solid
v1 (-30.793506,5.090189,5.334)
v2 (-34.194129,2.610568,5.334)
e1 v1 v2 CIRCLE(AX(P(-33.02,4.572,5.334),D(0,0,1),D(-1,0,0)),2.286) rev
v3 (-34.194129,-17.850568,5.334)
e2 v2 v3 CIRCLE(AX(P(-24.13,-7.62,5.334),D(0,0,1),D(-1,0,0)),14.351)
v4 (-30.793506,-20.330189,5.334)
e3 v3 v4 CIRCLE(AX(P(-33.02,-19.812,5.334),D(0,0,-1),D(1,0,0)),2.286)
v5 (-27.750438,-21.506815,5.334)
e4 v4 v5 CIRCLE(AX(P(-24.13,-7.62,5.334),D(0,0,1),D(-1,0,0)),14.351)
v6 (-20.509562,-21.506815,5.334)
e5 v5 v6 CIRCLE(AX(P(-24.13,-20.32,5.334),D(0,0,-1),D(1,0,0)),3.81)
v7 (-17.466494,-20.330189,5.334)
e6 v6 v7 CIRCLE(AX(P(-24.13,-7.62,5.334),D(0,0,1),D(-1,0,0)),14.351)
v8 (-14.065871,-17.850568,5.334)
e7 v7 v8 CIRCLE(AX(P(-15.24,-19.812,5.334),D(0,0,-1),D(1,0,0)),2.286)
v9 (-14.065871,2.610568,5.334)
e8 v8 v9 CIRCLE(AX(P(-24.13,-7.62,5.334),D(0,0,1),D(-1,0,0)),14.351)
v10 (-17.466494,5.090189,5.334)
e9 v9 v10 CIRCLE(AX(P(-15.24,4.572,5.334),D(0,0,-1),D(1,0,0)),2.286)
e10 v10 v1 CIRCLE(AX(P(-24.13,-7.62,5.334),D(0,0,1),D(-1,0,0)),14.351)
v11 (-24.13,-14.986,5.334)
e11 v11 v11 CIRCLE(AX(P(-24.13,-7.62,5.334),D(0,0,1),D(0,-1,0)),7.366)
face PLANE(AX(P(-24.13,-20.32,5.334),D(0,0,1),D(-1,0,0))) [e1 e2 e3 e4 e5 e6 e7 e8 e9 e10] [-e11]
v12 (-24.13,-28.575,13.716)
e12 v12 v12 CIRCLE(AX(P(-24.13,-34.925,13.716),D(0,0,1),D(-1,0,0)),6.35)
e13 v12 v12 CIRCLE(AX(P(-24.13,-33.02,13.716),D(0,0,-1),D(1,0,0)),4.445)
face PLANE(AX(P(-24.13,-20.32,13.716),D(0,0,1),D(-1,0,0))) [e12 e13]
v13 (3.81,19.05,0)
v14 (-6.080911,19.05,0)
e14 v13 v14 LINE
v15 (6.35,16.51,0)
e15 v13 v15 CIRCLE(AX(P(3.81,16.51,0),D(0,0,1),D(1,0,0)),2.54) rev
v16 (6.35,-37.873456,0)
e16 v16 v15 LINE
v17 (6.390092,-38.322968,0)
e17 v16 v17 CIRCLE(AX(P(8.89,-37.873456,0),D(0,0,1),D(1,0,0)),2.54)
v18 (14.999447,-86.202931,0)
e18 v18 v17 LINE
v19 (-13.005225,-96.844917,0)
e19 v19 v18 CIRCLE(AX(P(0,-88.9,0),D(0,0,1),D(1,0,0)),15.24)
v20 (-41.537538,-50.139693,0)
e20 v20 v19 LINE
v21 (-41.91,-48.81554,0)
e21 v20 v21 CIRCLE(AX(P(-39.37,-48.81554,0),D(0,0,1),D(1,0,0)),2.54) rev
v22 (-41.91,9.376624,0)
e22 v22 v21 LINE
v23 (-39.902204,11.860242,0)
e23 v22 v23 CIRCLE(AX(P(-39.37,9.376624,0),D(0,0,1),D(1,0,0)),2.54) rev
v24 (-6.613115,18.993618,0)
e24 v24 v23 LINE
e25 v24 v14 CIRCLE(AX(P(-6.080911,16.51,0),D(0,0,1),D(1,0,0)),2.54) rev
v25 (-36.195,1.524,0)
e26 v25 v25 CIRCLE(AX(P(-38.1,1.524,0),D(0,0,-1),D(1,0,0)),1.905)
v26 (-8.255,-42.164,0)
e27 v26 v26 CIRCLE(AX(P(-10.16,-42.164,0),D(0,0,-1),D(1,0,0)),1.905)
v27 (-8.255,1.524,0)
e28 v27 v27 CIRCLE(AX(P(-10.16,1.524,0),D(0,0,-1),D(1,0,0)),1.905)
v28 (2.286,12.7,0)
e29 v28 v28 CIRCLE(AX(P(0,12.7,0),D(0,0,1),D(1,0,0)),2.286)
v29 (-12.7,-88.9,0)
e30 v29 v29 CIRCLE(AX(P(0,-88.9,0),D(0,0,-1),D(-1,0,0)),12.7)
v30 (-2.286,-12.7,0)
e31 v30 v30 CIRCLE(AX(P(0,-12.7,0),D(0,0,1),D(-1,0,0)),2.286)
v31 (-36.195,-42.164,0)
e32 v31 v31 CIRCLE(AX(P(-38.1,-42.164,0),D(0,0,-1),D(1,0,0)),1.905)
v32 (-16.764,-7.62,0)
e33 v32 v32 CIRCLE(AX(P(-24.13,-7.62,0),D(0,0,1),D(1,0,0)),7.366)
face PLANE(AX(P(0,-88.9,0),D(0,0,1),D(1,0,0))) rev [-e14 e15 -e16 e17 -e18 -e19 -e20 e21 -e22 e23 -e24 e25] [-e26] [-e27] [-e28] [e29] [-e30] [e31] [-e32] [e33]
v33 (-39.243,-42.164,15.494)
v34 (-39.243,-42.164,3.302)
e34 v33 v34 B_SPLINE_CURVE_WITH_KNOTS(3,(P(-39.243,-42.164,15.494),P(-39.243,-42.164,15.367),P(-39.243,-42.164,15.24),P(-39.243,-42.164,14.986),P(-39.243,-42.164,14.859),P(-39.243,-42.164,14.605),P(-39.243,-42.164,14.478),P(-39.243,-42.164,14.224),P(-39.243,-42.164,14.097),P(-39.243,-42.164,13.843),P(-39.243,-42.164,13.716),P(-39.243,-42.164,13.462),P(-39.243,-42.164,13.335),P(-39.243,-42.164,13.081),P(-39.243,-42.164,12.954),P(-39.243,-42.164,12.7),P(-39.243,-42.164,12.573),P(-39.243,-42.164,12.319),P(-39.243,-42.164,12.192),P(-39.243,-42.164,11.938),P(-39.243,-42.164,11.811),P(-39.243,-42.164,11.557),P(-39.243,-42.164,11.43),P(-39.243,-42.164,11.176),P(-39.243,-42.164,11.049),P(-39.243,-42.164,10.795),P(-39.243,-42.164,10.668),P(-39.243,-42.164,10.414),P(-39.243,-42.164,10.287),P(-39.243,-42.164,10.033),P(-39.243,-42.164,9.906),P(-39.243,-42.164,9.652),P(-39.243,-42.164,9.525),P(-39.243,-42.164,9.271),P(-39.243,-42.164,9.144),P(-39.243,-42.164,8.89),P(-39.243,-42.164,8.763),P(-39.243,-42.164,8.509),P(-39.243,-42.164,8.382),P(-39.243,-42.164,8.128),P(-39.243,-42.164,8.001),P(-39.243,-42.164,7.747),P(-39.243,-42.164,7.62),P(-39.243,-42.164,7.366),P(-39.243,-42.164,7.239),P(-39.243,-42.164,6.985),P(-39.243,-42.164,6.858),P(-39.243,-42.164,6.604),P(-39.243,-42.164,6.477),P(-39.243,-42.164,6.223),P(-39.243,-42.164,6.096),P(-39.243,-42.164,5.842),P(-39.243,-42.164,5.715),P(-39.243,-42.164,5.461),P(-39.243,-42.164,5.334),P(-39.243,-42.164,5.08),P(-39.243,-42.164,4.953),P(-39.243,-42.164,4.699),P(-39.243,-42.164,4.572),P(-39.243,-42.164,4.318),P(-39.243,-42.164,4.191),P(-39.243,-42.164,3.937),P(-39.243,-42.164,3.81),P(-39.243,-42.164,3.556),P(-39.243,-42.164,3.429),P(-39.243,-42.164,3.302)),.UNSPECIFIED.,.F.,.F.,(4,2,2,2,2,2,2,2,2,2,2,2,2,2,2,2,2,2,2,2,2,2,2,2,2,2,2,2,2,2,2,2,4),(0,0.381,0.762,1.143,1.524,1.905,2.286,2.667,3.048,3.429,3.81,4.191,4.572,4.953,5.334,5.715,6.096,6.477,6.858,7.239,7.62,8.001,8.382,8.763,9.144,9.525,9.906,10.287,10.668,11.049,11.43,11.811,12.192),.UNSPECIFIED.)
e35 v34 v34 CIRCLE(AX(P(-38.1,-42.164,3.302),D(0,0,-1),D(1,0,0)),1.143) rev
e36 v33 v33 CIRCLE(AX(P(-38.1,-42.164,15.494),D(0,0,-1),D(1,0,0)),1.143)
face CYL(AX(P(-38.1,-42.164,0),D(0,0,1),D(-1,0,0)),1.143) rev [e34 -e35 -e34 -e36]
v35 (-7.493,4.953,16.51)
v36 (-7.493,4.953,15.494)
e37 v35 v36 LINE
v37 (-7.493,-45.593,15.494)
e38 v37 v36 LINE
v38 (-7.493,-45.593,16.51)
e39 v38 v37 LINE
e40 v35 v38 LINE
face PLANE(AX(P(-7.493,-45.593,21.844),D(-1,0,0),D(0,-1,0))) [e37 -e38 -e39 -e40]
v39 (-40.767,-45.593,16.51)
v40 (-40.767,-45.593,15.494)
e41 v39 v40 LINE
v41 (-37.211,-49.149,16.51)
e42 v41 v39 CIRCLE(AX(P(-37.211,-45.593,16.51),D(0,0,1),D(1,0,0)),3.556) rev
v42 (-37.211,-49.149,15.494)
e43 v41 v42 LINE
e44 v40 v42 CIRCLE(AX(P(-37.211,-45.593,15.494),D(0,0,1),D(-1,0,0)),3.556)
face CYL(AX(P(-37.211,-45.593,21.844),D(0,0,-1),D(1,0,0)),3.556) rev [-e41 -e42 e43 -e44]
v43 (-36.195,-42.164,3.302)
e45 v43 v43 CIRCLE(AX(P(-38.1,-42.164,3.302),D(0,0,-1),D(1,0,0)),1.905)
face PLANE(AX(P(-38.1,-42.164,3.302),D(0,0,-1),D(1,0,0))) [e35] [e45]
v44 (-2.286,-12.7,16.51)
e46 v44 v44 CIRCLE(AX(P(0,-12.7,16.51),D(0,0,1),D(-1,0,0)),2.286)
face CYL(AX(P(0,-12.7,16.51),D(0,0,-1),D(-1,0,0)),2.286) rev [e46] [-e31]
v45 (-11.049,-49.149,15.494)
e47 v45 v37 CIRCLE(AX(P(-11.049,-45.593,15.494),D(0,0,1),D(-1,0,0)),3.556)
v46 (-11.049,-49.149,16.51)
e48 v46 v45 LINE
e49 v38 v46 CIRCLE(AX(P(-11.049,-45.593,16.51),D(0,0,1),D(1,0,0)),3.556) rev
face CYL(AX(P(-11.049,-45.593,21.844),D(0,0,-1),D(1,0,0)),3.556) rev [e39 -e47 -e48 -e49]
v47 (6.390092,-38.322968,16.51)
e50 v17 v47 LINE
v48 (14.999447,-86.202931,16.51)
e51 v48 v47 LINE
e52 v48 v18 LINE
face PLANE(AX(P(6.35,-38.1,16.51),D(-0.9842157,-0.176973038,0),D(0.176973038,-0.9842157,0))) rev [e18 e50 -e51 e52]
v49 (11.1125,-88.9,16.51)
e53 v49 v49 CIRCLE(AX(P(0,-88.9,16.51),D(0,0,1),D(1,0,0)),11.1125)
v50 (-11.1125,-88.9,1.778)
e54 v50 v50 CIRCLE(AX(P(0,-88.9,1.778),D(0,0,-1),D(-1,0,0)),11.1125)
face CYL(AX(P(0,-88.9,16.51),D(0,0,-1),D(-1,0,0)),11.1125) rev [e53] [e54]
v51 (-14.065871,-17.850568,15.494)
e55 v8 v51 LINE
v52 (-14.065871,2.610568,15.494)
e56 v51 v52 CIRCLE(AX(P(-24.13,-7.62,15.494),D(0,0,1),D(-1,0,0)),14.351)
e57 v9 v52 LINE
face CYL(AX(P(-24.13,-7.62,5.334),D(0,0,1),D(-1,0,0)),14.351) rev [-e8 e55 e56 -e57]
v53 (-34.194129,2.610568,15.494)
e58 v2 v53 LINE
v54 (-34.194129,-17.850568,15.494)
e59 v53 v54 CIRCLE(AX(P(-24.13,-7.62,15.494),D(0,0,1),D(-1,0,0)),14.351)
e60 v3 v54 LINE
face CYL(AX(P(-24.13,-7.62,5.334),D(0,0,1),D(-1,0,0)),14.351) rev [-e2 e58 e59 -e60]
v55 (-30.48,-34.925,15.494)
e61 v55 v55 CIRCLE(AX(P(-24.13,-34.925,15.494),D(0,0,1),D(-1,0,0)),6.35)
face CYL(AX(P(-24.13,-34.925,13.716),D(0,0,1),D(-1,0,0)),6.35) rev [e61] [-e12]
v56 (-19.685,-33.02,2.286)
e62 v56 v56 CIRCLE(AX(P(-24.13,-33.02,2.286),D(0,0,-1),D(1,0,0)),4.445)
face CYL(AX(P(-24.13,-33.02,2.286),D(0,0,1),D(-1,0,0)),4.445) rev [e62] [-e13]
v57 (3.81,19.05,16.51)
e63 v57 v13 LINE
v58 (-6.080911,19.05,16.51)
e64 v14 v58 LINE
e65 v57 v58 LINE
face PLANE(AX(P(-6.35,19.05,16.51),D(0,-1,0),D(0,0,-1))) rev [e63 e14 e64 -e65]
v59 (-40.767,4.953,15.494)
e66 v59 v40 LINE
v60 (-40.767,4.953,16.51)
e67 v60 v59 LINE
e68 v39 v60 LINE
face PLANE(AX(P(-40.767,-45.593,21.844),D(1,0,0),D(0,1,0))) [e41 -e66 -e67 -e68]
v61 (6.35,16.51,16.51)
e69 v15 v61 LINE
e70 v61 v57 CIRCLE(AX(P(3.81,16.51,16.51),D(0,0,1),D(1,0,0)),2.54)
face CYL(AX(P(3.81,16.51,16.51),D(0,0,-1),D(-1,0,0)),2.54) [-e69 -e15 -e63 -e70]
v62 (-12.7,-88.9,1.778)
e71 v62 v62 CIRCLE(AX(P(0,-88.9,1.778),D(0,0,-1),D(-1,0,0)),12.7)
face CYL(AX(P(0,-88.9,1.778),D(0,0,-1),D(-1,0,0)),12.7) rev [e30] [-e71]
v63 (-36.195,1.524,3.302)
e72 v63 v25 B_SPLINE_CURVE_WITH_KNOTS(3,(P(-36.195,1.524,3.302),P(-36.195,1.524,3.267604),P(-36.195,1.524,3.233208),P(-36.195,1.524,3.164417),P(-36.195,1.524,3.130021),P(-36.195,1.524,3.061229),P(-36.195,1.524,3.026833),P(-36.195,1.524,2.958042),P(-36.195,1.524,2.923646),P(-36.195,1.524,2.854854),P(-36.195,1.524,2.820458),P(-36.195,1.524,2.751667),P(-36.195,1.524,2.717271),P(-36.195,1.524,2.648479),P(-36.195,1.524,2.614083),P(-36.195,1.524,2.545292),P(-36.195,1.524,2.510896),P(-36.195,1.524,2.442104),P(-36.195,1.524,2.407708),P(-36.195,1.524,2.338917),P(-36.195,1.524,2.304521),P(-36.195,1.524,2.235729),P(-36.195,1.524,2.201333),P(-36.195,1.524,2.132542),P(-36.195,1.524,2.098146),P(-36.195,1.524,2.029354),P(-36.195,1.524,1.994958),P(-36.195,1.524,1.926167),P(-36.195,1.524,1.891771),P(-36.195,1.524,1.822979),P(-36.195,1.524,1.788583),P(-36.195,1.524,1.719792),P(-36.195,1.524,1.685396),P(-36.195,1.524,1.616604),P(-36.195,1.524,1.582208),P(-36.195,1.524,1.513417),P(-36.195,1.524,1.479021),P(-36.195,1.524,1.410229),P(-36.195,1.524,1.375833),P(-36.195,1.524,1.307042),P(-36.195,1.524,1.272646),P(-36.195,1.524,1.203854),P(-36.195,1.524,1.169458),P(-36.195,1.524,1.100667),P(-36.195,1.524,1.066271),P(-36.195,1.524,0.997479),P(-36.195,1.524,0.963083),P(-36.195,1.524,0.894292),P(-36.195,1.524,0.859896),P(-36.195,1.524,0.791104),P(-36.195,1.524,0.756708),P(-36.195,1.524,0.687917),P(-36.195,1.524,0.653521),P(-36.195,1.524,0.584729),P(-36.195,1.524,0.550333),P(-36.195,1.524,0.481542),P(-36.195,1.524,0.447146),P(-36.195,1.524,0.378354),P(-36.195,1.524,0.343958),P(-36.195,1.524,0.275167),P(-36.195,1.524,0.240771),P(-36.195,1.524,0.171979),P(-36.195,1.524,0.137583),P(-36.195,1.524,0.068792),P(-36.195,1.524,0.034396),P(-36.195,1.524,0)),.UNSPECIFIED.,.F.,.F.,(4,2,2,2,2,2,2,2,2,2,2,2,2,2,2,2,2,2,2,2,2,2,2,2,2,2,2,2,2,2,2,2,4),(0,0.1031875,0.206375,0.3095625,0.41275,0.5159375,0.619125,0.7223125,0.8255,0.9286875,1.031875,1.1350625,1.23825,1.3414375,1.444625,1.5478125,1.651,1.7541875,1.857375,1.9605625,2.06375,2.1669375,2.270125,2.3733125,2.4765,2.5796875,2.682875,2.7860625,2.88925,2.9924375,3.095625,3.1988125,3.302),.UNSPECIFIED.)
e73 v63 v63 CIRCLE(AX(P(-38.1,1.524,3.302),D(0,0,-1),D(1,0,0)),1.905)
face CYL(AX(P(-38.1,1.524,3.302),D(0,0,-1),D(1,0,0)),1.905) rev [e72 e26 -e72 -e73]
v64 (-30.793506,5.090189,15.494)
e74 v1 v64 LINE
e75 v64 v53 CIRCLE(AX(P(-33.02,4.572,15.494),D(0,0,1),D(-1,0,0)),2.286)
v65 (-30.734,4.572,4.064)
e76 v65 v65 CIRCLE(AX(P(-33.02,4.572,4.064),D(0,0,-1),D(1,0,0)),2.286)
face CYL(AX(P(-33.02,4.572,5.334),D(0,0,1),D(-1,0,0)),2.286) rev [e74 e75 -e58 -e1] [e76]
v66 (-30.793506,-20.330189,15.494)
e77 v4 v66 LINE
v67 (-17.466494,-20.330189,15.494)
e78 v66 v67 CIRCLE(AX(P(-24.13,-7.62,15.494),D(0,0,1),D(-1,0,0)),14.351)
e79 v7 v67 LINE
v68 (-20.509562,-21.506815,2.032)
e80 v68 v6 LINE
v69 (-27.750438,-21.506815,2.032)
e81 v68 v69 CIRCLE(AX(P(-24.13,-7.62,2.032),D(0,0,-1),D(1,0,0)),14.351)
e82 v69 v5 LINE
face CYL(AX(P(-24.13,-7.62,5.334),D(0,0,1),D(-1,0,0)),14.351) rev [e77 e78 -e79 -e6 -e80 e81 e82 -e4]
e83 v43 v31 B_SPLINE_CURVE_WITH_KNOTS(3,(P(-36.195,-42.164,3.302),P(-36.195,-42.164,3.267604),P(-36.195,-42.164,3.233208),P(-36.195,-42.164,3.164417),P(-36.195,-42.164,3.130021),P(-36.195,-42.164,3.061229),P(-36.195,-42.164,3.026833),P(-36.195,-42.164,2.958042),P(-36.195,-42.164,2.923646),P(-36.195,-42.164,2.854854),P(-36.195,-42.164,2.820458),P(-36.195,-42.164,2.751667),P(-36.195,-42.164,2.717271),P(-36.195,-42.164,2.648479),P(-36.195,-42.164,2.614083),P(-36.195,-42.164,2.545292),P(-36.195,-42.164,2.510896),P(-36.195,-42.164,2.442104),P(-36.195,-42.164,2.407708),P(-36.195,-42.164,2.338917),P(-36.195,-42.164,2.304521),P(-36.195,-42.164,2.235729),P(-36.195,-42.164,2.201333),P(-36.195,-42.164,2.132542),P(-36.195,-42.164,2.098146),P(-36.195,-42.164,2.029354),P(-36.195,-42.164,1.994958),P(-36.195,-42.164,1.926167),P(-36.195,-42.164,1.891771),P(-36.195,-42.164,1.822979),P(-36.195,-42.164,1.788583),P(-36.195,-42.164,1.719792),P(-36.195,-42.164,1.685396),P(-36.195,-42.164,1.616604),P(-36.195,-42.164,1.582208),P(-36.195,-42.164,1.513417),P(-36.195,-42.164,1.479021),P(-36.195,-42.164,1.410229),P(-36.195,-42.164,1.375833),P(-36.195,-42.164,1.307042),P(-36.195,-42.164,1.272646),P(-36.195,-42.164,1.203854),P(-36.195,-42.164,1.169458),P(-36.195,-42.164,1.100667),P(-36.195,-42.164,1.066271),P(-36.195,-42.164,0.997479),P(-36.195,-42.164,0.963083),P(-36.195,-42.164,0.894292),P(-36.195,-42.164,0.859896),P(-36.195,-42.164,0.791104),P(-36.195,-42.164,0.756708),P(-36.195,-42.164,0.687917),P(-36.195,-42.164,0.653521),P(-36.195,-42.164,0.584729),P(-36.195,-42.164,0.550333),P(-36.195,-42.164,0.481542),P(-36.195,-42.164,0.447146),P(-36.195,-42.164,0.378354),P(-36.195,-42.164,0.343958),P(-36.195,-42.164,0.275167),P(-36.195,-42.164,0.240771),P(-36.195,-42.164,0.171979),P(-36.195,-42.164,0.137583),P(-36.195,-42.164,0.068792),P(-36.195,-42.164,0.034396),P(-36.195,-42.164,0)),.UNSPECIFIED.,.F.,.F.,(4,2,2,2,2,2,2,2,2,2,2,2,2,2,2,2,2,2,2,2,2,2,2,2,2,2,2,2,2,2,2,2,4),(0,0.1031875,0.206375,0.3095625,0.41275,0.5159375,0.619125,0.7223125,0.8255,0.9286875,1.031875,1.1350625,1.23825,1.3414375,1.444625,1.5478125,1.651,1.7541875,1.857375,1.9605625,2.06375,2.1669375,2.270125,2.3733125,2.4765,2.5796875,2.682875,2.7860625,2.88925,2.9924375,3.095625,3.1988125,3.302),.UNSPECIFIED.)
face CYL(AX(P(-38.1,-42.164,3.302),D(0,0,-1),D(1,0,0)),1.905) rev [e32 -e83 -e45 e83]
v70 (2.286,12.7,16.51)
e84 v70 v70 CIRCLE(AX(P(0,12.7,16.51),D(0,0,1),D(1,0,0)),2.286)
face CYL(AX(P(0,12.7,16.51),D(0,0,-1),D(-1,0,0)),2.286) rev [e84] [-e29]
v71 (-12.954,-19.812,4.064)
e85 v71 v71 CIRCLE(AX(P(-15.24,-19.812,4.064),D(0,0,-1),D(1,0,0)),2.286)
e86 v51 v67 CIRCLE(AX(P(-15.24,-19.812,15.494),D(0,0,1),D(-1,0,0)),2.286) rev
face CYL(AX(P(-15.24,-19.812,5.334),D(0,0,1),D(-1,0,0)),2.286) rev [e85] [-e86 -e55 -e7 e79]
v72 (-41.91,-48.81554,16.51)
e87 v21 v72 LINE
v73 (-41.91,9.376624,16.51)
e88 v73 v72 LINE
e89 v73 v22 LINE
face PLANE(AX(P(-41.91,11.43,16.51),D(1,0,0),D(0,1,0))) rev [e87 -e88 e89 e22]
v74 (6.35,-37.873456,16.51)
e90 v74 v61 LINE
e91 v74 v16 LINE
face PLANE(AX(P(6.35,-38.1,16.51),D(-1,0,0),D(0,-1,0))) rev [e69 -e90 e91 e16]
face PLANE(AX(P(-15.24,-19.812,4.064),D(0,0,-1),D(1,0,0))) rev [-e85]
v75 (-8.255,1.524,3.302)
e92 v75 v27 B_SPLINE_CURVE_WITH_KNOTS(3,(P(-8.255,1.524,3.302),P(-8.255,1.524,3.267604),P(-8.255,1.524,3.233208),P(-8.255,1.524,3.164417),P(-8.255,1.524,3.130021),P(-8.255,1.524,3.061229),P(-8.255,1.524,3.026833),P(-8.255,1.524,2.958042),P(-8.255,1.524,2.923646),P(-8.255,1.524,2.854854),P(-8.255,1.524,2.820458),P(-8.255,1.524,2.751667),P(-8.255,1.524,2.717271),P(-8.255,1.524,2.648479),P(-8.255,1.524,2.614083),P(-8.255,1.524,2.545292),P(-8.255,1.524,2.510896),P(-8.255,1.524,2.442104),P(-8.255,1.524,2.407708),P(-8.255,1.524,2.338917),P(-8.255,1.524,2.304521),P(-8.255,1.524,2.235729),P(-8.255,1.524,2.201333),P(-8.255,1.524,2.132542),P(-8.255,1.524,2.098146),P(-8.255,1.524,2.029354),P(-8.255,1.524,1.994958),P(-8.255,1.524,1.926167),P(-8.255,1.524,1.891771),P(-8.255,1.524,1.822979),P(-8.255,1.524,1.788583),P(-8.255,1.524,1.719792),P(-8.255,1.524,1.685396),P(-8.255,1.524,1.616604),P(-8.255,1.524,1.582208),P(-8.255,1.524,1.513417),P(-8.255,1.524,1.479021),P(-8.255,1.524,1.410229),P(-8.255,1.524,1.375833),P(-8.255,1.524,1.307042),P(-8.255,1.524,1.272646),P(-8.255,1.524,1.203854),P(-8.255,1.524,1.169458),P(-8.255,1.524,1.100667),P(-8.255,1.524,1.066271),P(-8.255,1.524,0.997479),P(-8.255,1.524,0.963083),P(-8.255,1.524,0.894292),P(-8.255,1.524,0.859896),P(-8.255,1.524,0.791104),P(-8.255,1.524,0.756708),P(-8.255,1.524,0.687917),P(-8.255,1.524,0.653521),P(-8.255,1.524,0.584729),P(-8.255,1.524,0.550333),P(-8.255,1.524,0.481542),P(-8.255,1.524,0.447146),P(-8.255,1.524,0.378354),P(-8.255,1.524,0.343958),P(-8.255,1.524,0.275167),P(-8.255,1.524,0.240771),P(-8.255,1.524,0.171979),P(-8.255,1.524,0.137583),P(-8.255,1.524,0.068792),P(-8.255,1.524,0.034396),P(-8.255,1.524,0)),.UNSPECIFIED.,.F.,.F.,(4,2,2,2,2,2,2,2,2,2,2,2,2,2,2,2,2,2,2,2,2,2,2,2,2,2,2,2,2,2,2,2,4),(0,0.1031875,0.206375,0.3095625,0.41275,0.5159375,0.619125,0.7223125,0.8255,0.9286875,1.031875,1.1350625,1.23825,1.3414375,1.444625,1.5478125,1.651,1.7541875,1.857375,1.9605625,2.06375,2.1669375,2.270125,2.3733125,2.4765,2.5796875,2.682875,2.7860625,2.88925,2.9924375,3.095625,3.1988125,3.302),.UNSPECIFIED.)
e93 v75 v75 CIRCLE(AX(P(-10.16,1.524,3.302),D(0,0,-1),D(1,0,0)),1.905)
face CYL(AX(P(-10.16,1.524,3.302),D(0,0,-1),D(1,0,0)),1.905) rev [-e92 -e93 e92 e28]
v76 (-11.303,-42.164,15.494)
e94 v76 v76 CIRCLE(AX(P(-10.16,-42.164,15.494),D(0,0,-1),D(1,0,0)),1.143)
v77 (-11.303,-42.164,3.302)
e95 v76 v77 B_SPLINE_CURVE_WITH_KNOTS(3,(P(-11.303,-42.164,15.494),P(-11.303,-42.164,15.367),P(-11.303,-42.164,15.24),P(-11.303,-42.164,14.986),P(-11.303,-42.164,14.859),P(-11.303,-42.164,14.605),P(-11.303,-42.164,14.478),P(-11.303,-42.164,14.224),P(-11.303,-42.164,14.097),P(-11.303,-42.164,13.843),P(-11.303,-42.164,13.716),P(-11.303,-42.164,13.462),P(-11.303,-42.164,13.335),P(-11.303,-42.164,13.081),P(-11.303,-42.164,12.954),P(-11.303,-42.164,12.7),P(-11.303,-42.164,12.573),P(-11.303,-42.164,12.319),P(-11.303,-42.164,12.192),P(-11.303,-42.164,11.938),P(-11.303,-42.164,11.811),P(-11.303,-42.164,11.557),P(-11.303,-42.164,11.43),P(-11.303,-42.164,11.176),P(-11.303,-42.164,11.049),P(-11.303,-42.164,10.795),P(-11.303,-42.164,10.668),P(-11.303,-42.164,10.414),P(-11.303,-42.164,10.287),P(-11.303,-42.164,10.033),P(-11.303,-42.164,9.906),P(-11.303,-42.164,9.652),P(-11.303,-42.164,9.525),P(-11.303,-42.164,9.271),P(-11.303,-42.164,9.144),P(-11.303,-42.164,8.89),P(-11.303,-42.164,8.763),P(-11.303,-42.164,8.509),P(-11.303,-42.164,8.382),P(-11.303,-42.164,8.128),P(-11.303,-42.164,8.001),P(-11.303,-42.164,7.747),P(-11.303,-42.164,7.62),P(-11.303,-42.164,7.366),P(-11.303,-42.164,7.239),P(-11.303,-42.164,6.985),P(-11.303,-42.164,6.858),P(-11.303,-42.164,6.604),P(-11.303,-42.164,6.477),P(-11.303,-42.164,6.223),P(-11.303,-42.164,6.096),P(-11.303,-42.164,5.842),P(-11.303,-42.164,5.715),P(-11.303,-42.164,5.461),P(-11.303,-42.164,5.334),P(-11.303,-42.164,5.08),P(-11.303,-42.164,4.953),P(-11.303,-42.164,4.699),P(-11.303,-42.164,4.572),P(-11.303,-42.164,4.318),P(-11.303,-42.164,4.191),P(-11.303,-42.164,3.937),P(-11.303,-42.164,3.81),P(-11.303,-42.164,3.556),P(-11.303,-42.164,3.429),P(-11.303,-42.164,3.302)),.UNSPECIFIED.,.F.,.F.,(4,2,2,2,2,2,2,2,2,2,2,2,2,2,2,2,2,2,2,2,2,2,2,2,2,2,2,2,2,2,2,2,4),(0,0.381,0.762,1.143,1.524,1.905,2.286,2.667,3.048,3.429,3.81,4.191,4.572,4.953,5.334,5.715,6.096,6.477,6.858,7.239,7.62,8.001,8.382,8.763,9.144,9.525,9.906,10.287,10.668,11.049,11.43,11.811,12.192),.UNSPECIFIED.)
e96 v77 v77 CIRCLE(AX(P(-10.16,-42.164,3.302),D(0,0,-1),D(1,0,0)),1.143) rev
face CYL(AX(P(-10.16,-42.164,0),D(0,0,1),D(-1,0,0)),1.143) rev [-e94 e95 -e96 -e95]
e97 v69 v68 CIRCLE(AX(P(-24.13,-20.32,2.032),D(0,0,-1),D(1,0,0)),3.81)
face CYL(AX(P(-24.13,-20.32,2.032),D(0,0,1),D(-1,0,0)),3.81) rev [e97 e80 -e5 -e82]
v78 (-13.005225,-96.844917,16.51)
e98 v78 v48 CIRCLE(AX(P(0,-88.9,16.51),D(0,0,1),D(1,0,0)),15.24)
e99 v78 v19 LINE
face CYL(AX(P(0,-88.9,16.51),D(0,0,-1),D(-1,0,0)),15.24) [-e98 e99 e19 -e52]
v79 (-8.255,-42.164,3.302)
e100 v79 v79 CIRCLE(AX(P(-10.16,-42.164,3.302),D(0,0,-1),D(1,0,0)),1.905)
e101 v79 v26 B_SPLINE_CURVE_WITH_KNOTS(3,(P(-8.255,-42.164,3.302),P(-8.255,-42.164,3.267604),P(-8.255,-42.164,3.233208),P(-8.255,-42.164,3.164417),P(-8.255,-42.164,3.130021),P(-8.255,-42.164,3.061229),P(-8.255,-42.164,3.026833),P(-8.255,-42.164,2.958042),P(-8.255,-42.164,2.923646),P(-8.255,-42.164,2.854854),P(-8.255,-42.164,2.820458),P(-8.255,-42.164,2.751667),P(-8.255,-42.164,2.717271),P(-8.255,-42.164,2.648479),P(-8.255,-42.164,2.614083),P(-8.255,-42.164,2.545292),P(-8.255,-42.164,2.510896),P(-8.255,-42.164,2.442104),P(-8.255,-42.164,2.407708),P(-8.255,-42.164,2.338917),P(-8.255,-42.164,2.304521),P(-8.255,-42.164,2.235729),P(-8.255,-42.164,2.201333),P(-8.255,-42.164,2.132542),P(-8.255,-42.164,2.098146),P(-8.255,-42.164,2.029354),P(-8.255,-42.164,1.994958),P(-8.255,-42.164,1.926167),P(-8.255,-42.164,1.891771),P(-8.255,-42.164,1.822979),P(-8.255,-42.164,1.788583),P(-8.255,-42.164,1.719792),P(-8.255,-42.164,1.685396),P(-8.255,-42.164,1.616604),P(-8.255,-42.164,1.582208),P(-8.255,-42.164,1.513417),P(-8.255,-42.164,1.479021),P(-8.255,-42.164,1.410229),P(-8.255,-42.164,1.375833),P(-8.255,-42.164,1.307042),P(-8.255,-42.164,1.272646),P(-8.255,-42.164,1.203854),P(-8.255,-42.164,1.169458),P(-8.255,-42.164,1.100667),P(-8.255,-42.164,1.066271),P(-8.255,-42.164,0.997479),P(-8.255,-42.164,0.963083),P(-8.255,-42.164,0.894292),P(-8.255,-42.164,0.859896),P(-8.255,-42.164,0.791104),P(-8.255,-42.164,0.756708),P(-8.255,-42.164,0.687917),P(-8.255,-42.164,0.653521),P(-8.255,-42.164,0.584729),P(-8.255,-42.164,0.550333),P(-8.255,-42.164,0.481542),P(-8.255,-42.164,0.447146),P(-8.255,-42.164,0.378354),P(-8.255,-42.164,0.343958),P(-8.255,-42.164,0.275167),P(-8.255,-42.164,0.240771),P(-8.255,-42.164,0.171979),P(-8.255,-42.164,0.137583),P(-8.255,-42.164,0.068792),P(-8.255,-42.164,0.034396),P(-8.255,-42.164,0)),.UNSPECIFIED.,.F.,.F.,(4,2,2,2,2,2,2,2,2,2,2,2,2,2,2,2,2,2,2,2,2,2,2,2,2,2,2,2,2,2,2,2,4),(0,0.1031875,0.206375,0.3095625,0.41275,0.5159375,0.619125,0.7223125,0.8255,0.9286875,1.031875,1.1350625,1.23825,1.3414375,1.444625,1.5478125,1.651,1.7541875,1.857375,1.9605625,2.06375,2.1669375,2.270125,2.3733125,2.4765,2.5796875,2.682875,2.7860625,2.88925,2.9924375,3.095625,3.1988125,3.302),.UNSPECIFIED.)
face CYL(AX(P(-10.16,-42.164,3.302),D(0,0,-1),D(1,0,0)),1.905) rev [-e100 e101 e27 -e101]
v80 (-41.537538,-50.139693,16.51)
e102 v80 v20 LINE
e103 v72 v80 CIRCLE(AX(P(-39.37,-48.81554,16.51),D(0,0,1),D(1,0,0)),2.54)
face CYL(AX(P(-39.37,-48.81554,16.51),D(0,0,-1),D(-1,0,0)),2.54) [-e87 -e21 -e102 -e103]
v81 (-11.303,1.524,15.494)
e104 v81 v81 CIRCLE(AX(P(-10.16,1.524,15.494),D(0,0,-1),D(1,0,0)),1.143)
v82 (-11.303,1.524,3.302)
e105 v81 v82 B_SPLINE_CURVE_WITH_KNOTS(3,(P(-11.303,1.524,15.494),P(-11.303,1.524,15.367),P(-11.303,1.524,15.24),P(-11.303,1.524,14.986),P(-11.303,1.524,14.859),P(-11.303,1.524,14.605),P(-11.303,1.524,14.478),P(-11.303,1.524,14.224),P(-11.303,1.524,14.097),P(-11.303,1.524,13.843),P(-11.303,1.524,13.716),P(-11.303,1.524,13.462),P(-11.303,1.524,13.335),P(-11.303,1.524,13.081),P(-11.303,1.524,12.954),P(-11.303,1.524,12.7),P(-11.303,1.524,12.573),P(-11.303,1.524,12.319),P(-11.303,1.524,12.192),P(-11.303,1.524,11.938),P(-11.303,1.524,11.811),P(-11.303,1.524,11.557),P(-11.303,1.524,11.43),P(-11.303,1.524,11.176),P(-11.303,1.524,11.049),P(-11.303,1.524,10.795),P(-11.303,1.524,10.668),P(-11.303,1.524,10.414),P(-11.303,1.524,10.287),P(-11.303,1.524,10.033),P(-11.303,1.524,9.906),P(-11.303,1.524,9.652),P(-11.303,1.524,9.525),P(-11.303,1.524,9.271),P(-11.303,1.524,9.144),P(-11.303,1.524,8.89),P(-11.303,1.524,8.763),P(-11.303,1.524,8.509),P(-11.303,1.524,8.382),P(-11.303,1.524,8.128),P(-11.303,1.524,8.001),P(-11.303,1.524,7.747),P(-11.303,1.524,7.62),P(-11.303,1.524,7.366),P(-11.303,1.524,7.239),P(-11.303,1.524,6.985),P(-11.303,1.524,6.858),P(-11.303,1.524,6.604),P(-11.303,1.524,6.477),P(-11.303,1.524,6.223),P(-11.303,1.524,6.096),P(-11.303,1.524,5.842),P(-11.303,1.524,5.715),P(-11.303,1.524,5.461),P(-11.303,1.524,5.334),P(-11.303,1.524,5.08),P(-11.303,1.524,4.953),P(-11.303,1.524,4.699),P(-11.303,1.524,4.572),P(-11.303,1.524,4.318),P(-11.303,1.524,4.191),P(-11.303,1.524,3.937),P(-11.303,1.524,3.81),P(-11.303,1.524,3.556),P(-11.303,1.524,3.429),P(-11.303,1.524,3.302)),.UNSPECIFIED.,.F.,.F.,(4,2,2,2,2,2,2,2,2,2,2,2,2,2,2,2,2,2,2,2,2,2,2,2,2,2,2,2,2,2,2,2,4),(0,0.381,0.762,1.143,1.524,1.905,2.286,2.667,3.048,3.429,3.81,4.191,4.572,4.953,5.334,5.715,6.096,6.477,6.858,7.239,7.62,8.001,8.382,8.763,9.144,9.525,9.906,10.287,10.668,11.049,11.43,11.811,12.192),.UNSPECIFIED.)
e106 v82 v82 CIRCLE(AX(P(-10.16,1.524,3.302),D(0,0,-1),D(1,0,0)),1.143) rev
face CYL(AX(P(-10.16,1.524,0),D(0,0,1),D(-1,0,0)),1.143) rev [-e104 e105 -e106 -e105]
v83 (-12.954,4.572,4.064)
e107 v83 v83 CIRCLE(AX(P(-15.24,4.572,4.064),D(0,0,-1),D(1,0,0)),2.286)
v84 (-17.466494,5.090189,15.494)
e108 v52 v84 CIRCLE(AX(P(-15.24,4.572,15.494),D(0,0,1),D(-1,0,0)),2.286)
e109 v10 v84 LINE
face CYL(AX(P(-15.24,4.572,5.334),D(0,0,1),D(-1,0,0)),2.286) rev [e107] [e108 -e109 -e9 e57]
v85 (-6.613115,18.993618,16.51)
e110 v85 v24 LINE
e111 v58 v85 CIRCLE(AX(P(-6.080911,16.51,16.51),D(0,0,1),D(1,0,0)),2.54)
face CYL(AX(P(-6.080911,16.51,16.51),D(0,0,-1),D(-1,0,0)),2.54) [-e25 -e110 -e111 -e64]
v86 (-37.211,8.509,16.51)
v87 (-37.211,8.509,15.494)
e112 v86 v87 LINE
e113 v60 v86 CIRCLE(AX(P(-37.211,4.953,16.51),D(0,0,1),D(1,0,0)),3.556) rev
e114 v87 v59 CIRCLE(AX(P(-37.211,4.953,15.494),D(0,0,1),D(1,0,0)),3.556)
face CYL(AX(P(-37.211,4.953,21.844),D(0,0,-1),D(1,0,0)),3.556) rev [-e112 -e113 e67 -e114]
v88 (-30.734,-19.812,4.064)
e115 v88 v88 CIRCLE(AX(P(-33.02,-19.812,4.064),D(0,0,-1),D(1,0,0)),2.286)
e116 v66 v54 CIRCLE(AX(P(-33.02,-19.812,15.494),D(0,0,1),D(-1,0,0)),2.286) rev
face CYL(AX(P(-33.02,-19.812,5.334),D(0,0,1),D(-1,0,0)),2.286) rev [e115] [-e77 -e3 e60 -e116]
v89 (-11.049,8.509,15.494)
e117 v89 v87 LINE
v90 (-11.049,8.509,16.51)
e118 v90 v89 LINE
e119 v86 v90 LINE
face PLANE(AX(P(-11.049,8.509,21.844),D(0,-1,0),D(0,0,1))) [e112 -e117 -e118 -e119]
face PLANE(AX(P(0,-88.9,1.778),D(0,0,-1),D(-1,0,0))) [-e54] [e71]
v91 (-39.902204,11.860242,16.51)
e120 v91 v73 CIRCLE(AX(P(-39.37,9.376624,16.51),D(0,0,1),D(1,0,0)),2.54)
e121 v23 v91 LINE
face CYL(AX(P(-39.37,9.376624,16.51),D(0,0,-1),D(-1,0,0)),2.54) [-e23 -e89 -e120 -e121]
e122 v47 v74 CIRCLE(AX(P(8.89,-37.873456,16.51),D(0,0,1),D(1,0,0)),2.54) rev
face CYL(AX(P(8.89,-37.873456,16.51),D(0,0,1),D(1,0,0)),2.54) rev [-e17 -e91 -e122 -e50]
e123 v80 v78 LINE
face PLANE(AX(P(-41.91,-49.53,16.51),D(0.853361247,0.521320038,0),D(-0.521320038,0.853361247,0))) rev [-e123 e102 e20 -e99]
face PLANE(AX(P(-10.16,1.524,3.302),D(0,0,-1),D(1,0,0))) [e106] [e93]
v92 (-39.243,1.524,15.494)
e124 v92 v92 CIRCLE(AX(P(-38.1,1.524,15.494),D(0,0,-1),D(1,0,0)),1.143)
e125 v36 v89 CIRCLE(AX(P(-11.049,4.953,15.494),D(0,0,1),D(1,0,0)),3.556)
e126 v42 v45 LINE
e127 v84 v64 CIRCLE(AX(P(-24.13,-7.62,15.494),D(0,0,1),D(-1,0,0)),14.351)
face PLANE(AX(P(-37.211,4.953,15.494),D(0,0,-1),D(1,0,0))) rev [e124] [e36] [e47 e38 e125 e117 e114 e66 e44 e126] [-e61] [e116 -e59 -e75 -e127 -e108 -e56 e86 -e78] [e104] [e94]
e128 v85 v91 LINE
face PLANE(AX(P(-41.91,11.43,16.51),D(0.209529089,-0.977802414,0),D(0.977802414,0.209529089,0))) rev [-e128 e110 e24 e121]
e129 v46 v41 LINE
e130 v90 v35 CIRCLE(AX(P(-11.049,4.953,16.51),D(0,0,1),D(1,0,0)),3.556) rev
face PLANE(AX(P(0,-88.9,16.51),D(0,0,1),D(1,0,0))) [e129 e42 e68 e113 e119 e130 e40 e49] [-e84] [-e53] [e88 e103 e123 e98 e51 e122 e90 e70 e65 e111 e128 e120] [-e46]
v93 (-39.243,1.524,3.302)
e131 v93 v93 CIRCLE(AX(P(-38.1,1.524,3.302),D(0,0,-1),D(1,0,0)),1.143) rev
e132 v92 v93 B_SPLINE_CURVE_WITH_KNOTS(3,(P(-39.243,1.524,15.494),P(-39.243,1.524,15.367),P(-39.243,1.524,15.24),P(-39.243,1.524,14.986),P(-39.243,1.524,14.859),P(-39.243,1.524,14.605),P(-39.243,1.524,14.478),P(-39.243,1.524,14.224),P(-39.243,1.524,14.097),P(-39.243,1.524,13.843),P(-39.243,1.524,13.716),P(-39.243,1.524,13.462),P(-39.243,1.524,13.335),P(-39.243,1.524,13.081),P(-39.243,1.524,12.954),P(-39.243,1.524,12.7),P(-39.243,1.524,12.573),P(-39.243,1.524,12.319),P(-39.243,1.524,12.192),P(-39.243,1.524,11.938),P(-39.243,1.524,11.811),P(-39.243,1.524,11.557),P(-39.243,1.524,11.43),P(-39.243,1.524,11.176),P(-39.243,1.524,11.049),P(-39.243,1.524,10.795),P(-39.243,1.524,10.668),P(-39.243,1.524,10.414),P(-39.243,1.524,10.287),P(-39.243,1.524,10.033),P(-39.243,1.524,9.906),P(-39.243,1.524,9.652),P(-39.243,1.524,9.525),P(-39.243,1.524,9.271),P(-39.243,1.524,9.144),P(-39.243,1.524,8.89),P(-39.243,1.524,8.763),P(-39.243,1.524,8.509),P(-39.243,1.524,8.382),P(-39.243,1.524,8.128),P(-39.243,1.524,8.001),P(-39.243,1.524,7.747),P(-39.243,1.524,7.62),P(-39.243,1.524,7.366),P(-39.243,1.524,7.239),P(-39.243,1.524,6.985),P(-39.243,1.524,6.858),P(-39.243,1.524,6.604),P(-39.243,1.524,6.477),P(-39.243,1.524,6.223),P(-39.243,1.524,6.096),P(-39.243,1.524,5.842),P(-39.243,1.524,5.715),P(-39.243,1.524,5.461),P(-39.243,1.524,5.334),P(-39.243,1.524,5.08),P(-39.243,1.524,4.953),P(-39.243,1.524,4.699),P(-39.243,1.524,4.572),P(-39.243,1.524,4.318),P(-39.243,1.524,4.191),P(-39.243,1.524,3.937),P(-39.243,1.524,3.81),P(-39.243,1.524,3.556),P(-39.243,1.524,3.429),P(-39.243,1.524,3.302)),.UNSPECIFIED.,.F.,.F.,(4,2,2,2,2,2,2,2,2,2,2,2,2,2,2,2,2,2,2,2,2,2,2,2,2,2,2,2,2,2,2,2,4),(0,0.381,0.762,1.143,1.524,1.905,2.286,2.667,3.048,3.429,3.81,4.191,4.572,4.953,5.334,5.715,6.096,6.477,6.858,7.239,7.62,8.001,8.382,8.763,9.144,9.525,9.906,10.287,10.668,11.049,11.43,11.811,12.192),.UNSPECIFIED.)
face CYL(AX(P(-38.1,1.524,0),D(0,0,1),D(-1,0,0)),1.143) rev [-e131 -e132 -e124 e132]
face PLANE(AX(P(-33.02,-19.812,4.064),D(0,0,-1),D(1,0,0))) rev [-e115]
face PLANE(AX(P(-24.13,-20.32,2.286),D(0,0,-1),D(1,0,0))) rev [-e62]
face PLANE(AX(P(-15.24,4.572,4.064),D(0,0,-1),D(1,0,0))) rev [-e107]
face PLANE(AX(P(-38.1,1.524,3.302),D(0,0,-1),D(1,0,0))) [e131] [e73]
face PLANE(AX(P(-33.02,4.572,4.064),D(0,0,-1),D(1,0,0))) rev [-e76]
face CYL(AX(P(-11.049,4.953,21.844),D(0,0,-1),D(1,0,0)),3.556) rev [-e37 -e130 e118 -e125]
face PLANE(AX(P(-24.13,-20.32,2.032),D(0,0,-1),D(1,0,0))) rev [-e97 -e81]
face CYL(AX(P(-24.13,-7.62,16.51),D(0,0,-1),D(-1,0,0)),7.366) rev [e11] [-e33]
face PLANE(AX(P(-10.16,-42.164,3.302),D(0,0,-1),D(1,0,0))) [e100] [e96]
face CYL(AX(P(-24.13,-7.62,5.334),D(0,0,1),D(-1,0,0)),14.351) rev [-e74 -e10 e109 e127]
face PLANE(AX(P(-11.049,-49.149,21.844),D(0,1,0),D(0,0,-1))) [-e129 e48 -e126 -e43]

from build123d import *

# Parameters (mm, degrees)
SKETCH1_R             = 2.286
SKETCH1_R_2           = 11.1125
SKETCH1_R_3           = 7.366
BOSS_EXTRUDE1_DEPTH   = 16.51
SKETCH2_R             = 12.7
CUT_EXTRUDE1_DEPTH    = 1.778
CAVITY1_START         = 5.334
CAVITY1_OUTLINE_R     = 1.143
CAVITY1_OUTLINE_R_2   = 7.366
CAVITY1_OUTLINE_R_3   = 4.445
CAVITY1_DEPTH         = 11.176
CAVITY1_START_2       = 15.494
CAVITY1_2_OUTLINE_R   = 1.143
CAVITY1_2_OUTLINE_R_2 = 4.445
CAVITY1_2_DEPTH       = 1.016
CAVITY1_START_3       = 2.286
CAVITY1_3_OUTLINE_R   = 1.143
CAVITY1_3_OUTLINE_R_2 = 4.445
CAVITY1_3_DEPTH       = 3.048
CAVITY1_4_OUTLINE_R   = 1.905
CAVITY1_4_DEPTH       = 3.302
CAVITY1_START_4       = 13.716
CAVITY1_5_DEPTH       = 1.778
CAVITY1_START_5       = 4.064
CAVITY1_6_OUTLINE_R   = 2.286
CAVITY1_6_DEPTH       = 1.27
CAVITY1_START_6       = 2.032
CAVITY1_7_DEPTH       = 0.254
FILLET1_R             = 2.54


# Read off the part's stored shape, not the designer's step: Cavity1
with BuildPart() as part:
    # Sketch1 → Boss-Extrude1 (new body)
    with BuildSketch(Plane.XY):
        with BuildLine():
            Line((-6.35, 19.05), (6.35, 19.05))
            Line((6.35, 19.05), (6.35, -38.1))
            Line((6.35, -38.1), (14.999447267, -86.202930908))
            ThreePointArc((14.999447267, -86.202930908), (5.413612396, -103.146066153), (-13.00522541, -96.844917372))
            Line((-13.00522541, -96.844917372), (-41.91, -49.53))
            Line((-41.91, -49.53), (-41.91, 11.43))
            Line((-41.91, 11.43), (-6.35, 19.05))
        make_face()
        with Locations((0, 12.7)):
            Circle(SKETCH1_R, mode=Mode.SUBTRACT)
        with Locations(Location((0, -12.7, 0), (0, 0, 180))):
            Circle(SKETCH1_R, mode=Mode.SUBTRACT)
        with Locations((0, -88.9)):
            Circle(SKETCH1_R_2, mode=Mode.SUBTRACT)
        with Locations((-24.13, -7.62)):
            Circle(SKETCH1_R_3, mode=Mode.SUBTRACT)
    extrude(amount=BOSS_EXTRUDE1_DEPTH)

    # Sketch2 → Cut-Extrude1 (cut)
    with BuildSketch(Plane(origin=(0, 0, 0), x_dir=(-1, 0, 0), z_dir=(0, 0, -1))):
        with Locations((0, -88.9)):
            Circle(SKETCH2_R)
    extrude(amount=-CUT_EXTRUDE1_DEPTH, mode=Mode.SUBTRACT)

    # Cavity1 outline → Cavity1 (cut)
    # profile 1 of 6: a face of its own
    with BuildSketch(Plane.XY.offset(CAVITY1_START)):
        with Locations((-38.1, 1.524)):
            Circle(CAVITY1_OUTLINE_R)
    # profile 2 of 6: a face of its own
    with BuildSketch(Plane.XY.offset(CAVITY1_START)):
        with BuildLine():
            ThreePointArc((-34.194128852, 2.610567504), (-38.481, -7.62), (-34.194128852, -17.850567504))
            ThreePointArc((-34.194128852, -17.850567504), (-34.366847552, -21.659105214), (-30.793505747, -20.330188518))
            ThreePointArc((-30.793505747, -20.330188518), (-24.13, -21.971), (-17.466494253, -20.330188518))
            ThreePointArc((-17.466494253, -20.330188518), (-13.893152448, -21.659105214), (-14.065871148, -17.850567504))
            ThreePointArc((-14.065871148, -17.850567504), (-9.779, -7.62), (-14.065871148, 2.610567504))
            ThreePointArc((-14.065871148, 2.610567504), (-13.893152448, 6.419105214), (-17.466494253, 5.090188518))
            ThreePointArc((-17.466494253, 5.090188518), (-24.13, 6.731), (-30.793505747, 5.090188518))
            ThreePointArc((-30.793505747, 5.090188518), (-34.366847552, 6.419105214), (-34.194128852, 2.610567504))
        make_face()
        with Locations((-24.13, -7.62)):
            Circle(CAVITY1_OUTLINE_R_2, mode=Mode.SUBTRACT)
    # profile 3 of 6: a face of its own
    with BuildSketch(Plane.XY.offset(CAVITY1_START)):
        with Locations((-38.1, -42.164)):
            Circle(CAVITY1_OUTLINE_R)
    # profile 4 of 6: a face of its own
    with BuildSketch(Plane.XY.offset(CAVITY1_START)):
        with Locations((-24.13, -33.02)):
            Circle(CAVITY1_OUTLINE_R_3)
    # profile 5 of 6: a face of its own
    with BuildSketch(Plane.XY.offset(CAVITY1_START)):
        with Locations((-10.16, 1.524)):
            Circle(CAVITY1_OUTLINE_R)
    # profile 6 of 6: a face of its own
    with BuildSketch(Plane.XY.offset(CAVITY1_START)):
        with Locations((-10.16, -42.164)):
            Circle(CAVITY1_OUTLINE_R)
    extrude(amount=CAVITY1_DEPTH, mode=Mode.SUBTRACT)

    # Cavity1 2 outline → Cavity1 2 (cut)
    with BuildSketch(Plane.XY.offset(CAVITY1_START_2)):
        with BuildLine():
            ThreePointArc((-40.767, -45.593), (-39.725471714, -48.107471714), (-37.211, -49.149))
            Line((-37.211, -49.149), (-11.049, -49.149))
            ThreePointArc((-11.049, -49.149), (-8.534528286, -48.107471714), (-7.493, -45.593))
            Line((-7.493, -45.593), (-7.493, 4.953))
            ThreePointArc((-7.493, 4.953), (-8.534528286, 7.467471714), (-11.049, 8.509))
            Line((-11.049, 8.509), (-37.211, 8.509))
            ThreePointArc((-37.211, 8.509), (-39.725471714, 7.467471714), (-40.767, 4.953))
            Line((-40.767, 4.953), (-40.767, -45.593))
        make_face()
        with Locations((-38.1, 1.524)):
            Circle(CAVITY1_2_OUTLINE_R, mode=Mode.SUBTRACT)
        with BuildLine():
            ThreePointArc((-34.194128852, 2.610567504), (-34.366847552, 6.419105214), (-30.793505747, 5.090188518))
            ThreePointArc((-30.793505747, 5.090188518), (-24.13, 6.731), (-17.466494253, 5.090188518))
            ThreePointArc((-17.466494253, 5.090188518), (-13.893152448, 6.419105214), (-14.065871148, 2.610567504))
            ThreePointArc((-14.065871148, 2.610567504), (-9.779, -7.62), (-14.065871148, -17.850567504))
            ThreePointArc((-14.065871148, -17.850567504), (-13.893152448, -21.659105214), (-17.466494253, -20.330188518))
            ThreePointArc((-17.466494253, -20.330188518), (-24.13, -21.971), (-30.793505747, -20.330188518))
            ThreePointArc((-30.793505747, -20.330188518), (-34.366847552, -21.659105214), (-34.194128852, -17.850567504))
            ThreePointArc((-34.194128852, -17.850567504), (-38.481, -7.62), (-34.194128852, 2.610567504))
        make_face(mode=Mode.SUBTRACT)
        with Locations((-24.13, -33.02)):
            Circle(CAVITY1_2_OUTLINE_R_2, mode=Mode.SUBTRACT)
        with Locations((-38.1, -42.164)):
            Circle(CAVITY1_2_OUTLINE_R, mode=Mode.SUBTRACT)
        with Locations((-10.16, 1.524)):
            Circle(CAVITY1_2_OUTLINE_R, mode=Mode.SUBTRACT)
        with Locations((-10.16, -42.164)):
            Circle(CAVITY1_2_OUTLINE_R, mode=Mode.SUBTRACT)
    extrude(amount=CAVITY1_2_DEPTH, mode=Mode.SUBTRACT)

    # Cavity1 3 outline → Cavity1 3 (cut)
    with BuildSketch(Plane.XY.offset(CAVITY1_START_3)):
        with Locations((-38.1, 1.524)):
            Circle(CAVITY1_3_OUTLINE_R)
        with Locations((-38.1, -42.164)):
            Circle(CAVITY1_3_OUTLINE_R)
        with BuildLine():
            ThreePointArc((-20.50956216, -21.506815), (-24.13, -16.51), (-27.75043784, -21.506815))
            ThreePointArc((-27.75043784, -21.506815), (-24.13, -21.971), (-20.50956216, -21.506815))
        make_face()
        with Locations((-24.13, -33.02)):
            Circle(CAVITY1_3_OUTLINE_R_2)
        with Locations((-10.16, 1.524)):
            Circle(CAVITY1_3_OUTLINE_R)
        with Locations((-10.16, -42.164)):
            Circle(CAVITY1_3_OUTLINE_R)
    extrude(amount=CAVITY1_3_DEPTH, mode=Mode.SUBTRACT)

    # Cavity1 4 outline → Cavity1 4 (cut)
    with BuildSketch(Plane.XY):
        with Locations((-38.1, 1.524)):
            Circle(CAVITY1_4_OUTLINE_R)
        with Locations((-38.1, -42.164)):
            Circle(CAVITY1_4_OUTLINE_R)
        with Locations((-10.16, 1.524)):
            Circle(CAVITY1_4_OUTLINE_R)
        with Locations((-10.16, -42.164)):
            Circle(CAVITY1_4_OUTLINE_R)
    extrude(amount=CAVITY1_4_DEPTH, mode=Mode.SUBTRACT)

    # Cavity1 5 outline → Cavity1 5 (cut)
    with BuildSketch(Plane.XY.offset(CAVITY1_START_4)):
        with BuildLine():
            Line((-28.458512749, -32.009058667), (-30.399761763, -33.918725966))
            ThreePointArc((-30.399761763, -33.918725966), (-29.735544051, -37.908349777), (-26.797234263, -40.687669641))
            Line((-26.797234263, -40.687669641), (-25.65265334, -37.196068942))
            ThreePointArc((-25.65265334, -37.196068942), (-28.039642573, -35.1348806), (-28.458512749, -32.009058667))
        make_face()
        with BuildLine():
            ThreePointArc((-25.391900971, -28.701648336), (-28.711043619, -30.52766679), (-30.399761763, -33.918725966))
            Line((-30.399761763, -33.918725966), (-28.458512749, -32.009058667))
            ThreePointArc((-28.458512749, -32.009058667), (-27.357510815, -29.963662495), (-25.375086436, -28.752941907))
            Line((-25.375086436, -28.752941907), (-25.391900971, -28.701648336))
        make_face()
        with BuildLine():
            ThreePointArc((-25.033307826, -28.639577582), (-25.213049158, -28.66804351), (-25.391900971, -28.701648336))
            Line((-25.391900971, -28.701648336), (-25.375086436, -28.752941907))
            ThreePointArc((-25.375086436, -28.752941907), (-25.223135952, -28.711510846), (-25.069813075, -28.675488936))
            Line((-25.069813075, -28.675488936), (-25.033307826, -28.639577582))
        make_face()
        with BuildLine():
            Line((-25.65265334, -37.196068942), (-26.797234263, -40.687669641))
            ThreePointArc((-26.797234263, -40.687669641), (-24.13, -41.275), (-21.462765737, -40.687669641))
            Line((-21.462765737, -40.687669641), (-22.60734666, -37.196068942))
            ThreePointArc((-22.60734666, -37.196068942), (-24.13, -37.465), (-25.65265334, -37.196068942))
        make_face()
        with BuildLine():
            Line((-23.190186925, -28.675488936), (-23.226692174, -28.639577582))
            ThreePointArc((-23.226692174, -28.639577582), (-23.67719342, -28.591164969), (-24.130000054, -28.575))
            ThreePointArc((-24.130000054, -28.575), (-23.657414944, -28.600193628), (-23.190186925, -28.675488936))
        make_face()
        with BuildLine():
            ThreePointArc((-22.868099029, -28.701648336), (-23.046950842, -28.66804351), (-23.226692174, -28.639577582))
            Line((-23.226692174, -28.639577582), (-23.190186925, -28.675488936))
            ThreePointArc((-23.190186925, -28.675488936), (-23.036864049, -28.711510846), (-22.884913564, -28.752941907))
            Line((-22.884913564, -28.752941907), (-22.868099029, -28.701648336))
        make_face()
        with BuildLine():
            ThreePointArc((-24.130000054, -28.575), (-24.582806633, -28.591164973), (-25.033307826, -28.639577582))
            Line((-25.033307826, -28.639577582), (-25.069813075, -28.675488936))
            ThreePointArc((-25.069813075, -28.675488936), (-24.60258511, -28.600193634), (-24.130000054, -28.575))
        make_face()
        with BuildLine():
            Line((-22.60734666, -37.196068942), (-21.462765737, -40.687669641))
            ThreePointArc((-21.462765737, -40.687669641), (-18.77932539, -38.344470897), (-17.78, -34.925))
            ThreePointArc((-17.78, -34.925), (-17.800091344, -34.420266009), (-17.860238237, -33.918725967))
            Line((-17.860238237, -33.918725967), (-19.80148725, -32.009058668))
            ThreePointArc((-19.80148725, -32.009058668), (-19.71421784, -32.511184794), (-19.685, -33.02))
            ThreePointArc((-19.685, -33.02), (-20.488144766, -35.5685124), (-22.60734666, -37.196068942))
        make_face()
        with BuildLine():
            ThreePointArc((-17.860238237, -33.918725967), (-19.548956381, -30.52766679), (-22.868099029, -28.701648336))
            Line((-22.868099029, -28.701648336), (-22.884913564, -28.752941907))
            ThreePointArc((-22.884913564, -28.752941907), (-20.902489185, -29.963662496), (-19.80148725, -32.009058668))
            Line((-19.80148725, -32.009058668), (-17.860238237, -33.918725967))
        make_face()
    extrude(amount=CAVITY1_5_DEPTH, mode=Mode.SUBTRACT)

    # Cavity1 6 outline → Cavity1 6 (cut)
    with BuildSketch(Plane.XY.offset(CAVITY1_START_5)):
        with Locations((-33.02, 4.572)):
            Circle(CAVITY1_6_OUTLINE_R)
        with Locations((-33.02, -19.812)):
            Circle(CAVITY1_6_OUTLINE_R)
        with Locations((-15.24, 4.572)):
            Circle(CAVITY1_6_OUTLINE_R)
        with Locations((-15.24, -19.812)):
            Circle(CAVITY1_6_OUTLINE_R)
    extrude(amount=CAVITY1_6_DEPTH, mode=Mode.SUBTRACT)

    # Cavity1 7 outline → Cavity1 7 (cut)
    with BuildSketch(Plane.XY.offset(CAVITY1_START_6)):
        with BuildLine():
            ThreePointArc((-20.50956216, -21.506815), (-24.13, -16.51), (-27.75043784, -21.506815))
            ThreePointArc((-27.75043784, -21.506815), (-24.13, -21.971), (-20.50956216, -21.506815))
        make_face()
    extrude(amount=CAVITY1_7_DEPTH, mode=Mode.SUBTRACT)

    # Fillet1
    fillet1_edges = [part.edges().sort_by_distance(p)[0] for p in [
        (6.35, -38.1, 8.255),
        (-41.91, -49.53, 8.255),
        (-41.91, 11.43, 8.255),
        (-6.35, 19.05, 8.255),
        (6.35, 19.05, 8.255),
    ]]
    fillet(fillet1_edges, radius=FILLET1_R)


solid = part.part
